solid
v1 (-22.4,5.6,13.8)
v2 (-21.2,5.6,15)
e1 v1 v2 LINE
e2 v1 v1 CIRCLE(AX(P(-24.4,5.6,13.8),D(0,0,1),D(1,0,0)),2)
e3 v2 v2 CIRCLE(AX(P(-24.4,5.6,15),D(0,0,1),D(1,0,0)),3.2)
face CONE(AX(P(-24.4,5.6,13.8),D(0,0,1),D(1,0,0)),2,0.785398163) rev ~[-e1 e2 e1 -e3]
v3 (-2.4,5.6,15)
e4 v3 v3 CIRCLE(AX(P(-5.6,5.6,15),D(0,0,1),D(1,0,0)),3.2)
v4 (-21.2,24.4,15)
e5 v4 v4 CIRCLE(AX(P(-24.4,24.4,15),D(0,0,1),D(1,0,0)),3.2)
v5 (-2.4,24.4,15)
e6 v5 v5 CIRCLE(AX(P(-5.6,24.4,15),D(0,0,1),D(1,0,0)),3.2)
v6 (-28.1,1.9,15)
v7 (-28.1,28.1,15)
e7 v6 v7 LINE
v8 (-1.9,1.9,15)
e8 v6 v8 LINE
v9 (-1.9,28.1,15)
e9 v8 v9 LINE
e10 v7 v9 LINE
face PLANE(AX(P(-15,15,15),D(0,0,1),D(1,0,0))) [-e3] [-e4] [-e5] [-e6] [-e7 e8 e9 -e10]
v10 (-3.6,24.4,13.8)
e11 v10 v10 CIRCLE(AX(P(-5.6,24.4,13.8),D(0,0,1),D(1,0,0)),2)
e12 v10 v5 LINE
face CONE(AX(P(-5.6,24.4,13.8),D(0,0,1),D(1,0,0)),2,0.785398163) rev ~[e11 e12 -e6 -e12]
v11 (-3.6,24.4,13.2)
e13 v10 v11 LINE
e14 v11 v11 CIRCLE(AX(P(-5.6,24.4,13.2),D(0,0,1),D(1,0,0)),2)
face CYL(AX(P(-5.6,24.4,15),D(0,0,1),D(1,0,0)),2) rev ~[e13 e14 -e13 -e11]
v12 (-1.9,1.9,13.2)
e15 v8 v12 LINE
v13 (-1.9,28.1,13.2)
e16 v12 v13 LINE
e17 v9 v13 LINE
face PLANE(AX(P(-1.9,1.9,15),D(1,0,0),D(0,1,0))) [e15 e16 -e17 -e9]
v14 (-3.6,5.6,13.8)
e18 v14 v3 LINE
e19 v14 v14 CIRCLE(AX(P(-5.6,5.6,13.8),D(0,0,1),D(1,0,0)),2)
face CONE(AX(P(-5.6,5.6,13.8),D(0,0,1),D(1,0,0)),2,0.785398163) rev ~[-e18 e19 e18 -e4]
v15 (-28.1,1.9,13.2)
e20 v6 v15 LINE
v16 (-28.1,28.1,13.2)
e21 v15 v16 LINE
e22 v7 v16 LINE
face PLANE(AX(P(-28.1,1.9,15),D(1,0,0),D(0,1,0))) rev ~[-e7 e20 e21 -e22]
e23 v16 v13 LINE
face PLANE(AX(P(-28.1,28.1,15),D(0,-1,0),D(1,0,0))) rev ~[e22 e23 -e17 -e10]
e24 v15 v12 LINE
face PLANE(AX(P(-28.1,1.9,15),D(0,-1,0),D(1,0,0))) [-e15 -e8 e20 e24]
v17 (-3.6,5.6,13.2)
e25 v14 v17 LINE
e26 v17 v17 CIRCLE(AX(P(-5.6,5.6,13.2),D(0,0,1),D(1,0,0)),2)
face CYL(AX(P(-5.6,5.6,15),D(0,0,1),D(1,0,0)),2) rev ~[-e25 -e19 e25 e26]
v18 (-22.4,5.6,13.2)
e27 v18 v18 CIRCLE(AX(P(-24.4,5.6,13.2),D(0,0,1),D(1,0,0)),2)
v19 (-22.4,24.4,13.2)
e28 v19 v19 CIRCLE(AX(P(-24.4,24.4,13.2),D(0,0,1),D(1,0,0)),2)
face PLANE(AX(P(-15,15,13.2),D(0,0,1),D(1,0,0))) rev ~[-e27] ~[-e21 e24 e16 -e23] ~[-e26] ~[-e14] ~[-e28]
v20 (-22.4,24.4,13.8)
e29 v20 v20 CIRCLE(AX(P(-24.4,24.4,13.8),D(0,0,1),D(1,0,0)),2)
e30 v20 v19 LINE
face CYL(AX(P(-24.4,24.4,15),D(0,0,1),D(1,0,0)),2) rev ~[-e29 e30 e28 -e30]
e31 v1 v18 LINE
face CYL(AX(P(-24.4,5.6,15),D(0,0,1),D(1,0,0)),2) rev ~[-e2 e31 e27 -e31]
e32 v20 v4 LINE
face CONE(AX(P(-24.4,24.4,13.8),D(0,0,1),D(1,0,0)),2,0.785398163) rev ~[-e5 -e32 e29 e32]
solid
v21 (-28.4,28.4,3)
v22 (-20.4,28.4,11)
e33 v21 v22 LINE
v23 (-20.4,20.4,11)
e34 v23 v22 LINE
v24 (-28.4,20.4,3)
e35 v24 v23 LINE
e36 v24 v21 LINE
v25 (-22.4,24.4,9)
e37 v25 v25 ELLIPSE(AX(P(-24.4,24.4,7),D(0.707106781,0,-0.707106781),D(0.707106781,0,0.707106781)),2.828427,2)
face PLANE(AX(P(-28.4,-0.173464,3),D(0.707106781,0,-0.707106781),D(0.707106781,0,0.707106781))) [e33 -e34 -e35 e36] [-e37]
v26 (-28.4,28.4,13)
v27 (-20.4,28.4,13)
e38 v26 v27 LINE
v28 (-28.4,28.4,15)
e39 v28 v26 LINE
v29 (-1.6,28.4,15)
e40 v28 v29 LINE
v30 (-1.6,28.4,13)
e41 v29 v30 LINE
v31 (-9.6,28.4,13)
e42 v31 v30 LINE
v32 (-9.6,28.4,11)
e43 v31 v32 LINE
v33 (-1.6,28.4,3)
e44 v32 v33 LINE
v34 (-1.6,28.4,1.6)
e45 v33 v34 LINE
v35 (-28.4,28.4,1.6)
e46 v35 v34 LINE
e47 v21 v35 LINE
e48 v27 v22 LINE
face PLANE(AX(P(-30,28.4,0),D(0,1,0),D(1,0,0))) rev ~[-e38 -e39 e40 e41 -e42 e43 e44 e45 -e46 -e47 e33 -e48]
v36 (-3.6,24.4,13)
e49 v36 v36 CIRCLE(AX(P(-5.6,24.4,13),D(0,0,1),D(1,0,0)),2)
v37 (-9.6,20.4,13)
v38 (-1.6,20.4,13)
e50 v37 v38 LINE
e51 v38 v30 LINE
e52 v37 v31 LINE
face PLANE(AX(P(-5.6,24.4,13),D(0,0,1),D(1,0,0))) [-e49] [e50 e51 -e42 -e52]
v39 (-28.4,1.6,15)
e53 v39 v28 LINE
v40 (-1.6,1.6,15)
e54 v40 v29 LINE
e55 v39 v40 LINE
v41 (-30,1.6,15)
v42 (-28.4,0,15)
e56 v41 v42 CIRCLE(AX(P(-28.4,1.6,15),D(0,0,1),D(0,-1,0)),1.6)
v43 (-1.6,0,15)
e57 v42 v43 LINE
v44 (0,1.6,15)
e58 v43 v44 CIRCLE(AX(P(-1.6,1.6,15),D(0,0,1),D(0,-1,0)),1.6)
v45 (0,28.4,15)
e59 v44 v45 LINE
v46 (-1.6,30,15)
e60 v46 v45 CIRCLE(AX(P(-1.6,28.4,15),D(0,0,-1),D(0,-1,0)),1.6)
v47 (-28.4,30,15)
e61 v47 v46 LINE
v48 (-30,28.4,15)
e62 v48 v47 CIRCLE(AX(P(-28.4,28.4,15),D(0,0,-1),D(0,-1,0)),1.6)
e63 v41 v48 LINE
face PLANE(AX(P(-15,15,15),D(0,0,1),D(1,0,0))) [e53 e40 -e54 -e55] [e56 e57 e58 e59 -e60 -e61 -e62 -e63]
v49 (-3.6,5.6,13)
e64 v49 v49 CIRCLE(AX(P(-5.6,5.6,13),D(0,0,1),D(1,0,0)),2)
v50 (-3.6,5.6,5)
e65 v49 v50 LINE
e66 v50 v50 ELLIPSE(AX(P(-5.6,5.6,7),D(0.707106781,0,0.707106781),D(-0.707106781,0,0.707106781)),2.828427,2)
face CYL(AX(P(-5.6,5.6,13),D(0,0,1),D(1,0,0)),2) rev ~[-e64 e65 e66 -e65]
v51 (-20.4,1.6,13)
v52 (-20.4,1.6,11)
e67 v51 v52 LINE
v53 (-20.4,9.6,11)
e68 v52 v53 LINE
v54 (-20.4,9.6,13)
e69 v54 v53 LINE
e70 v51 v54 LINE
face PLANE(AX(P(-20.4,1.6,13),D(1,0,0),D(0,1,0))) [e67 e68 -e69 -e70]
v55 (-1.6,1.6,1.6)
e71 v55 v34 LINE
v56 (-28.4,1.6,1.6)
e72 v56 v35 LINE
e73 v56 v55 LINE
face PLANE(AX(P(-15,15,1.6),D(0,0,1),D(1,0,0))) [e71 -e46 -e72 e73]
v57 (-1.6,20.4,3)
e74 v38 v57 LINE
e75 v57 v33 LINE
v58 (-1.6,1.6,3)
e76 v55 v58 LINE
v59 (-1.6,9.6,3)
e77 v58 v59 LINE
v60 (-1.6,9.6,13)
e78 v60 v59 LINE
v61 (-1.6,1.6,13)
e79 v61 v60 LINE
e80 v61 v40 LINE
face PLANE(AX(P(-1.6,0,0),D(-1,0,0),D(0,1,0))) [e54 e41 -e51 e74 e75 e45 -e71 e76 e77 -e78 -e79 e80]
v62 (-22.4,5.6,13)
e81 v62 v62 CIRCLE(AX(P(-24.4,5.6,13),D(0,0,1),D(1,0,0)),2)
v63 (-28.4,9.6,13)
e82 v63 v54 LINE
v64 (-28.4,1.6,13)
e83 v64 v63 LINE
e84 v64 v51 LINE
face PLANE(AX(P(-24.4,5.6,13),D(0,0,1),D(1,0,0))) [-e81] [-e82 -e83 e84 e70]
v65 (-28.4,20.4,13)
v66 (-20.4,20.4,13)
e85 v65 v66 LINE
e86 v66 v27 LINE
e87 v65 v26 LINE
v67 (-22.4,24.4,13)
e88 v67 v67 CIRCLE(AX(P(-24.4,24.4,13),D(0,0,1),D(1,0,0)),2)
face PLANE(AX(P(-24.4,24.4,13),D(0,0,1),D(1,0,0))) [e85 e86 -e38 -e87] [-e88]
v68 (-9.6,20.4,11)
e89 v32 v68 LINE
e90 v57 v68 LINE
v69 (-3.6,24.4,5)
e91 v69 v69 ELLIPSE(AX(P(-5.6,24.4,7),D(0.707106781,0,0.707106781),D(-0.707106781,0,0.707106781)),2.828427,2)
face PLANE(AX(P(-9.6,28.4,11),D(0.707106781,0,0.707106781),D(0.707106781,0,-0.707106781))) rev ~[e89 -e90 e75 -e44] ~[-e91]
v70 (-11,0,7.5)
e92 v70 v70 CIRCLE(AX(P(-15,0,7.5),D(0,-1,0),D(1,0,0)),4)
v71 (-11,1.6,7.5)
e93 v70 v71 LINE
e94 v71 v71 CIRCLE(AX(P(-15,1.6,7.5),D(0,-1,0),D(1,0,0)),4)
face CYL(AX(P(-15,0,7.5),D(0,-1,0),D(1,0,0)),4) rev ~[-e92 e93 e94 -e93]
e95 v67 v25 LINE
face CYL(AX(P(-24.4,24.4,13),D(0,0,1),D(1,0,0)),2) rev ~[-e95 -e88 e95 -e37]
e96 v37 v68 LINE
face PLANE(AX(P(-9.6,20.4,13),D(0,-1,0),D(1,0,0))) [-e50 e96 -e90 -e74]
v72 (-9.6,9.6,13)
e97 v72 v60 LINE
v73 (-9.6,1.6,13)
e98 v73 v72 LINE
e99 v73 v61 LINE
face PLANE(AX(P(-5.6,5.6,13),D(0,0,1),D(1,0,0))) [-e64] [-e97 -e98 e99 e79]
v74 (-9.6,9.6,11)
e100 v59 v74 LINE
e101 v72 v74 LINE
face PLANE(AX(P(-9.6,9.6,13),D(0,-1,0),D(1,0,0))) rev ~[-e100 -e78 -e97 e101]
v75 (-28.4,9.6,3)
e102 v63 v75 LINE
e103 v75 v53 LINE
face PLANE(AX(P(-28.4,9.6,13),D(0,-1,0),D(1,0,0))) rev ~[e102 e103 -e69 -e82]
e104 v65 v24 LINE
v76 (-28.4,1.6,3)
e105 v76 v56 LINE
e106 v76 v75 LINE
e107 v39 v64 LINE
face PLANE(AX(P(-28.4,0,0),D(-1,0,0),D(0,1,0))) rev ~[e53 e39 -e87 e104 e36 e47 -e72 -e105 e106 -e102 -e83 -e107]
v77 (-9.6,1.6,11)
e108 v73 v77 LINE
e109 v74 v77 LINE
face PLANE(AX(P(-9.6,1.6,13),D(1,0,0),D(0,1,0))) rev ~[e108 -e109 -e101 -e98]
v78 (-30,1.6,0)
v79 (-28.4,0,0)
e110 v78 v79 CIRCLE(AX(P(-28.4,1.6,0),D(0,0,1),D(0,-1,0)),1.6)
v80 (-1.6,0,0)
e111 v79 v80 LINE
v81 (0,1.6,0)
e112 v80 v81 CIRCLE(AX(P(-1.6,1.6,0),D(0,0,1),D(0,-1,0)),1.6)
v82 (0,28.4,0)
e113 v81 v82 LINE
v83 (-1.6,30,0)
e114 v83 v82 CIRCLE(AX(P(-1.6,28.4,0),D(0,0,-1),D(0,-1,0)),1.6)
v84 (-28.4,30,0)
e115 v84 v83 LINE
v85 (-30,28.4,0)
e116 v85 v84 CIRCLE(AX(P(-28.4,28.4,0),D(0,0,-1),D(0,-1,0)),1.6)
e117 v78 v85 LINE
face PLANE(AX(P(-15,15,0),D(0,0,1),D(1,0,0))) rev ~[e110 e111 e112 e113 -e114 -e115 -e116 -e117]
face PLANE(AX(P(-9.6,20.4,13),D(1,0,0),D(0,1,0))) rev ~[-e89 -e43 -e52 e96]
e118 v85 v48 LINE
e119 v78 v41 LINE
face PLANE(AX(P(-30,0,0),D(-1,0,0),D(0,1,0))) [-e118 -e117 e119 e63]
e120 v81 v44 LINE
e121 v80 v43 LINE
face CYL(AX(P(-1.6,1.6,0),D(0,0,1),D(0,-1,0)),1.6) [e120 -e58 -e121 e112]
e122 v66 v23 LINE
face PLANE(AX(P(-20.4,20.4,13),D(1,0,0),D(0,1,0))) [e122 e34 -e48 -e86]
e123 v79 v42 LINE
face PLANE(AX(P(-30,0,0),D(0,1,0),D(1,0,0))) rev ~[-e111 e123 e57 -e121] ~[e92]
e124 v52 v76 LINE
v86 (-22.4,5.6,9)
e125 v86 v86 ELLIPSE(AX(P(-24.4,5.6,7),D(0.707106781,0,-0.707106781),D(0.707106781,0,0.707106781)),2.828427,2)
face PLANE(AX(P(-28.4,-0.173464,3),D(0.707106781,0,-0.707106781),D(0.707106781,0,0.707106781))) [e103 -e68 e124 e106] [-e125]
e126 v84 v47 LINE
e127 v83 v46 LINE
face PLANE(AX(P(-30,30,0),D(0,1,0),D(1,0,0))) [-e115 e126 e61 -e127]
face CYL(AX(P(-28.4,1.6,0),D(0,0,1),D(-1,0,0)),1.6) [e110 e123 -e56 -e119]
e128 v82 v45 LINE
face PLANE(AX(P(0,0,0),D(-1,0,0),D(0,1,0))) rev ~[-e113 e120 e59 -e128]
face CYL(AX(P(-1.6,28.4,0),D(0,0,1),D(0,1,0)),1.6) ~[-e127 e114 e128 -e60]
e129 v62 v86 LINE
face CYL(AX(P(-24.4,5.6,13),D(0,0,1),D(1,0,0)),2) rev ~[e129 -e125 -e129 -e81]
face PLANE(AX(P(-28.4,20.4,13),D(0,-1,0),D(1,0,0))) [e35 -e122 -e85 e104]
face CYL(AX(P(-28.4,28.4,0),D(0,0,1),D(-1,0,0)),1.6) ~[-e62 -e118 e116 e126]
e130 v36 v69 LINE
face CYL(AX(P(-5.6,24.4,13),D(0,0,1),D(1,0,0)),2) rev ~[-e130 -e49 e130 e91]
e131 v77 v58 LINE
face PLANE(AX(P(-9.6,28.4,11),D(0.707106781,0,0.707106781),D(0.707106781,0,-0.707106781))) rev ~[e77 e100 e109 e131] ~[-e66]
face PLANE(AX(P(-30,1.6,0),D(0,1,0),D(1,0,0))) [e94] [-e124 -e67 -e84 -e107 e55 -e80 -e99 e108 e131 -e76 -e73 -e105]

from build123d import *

# Parameters (mm, degrees)
F0_W         = 30
F0_H         = 30
F1_DEPTH     = 15
F2_T         = -1.6
F4_W         = 8
F4_H         = 8
F4_R         = 2
F5_DEPTH     = 10
F6_T4_DEPTH  = 28.5734639037
F6_T9_DEPTH  = 28.5734639037
F6_T14_DEPTH = 28.5734639037
F6_T19_DEPTH = 28.5734639037
F7_R         = 4
F8_DEPTH     = 1.6
F9_W         = 26.2
F9_H         = 26.2
F9_R         = 2
F10_DEPTH    = 1.8
F11_SIZE     = 1.2
F12_R        = 1.6


# Not quite as in the source:
# - a fillet or chamfer that OpenCascade refuses, or shapes differently, is made with other operations: its cross-section is extruded or revolved along the edge and cut away or added


with BuildPart() as f1:
    # F0 (on Top) → F1 (new body)
    with BuildSketch(Plane.XY):
        with Locations((-15, 15)):
            Rectangle(F0_W, F0_H)
    extrude(amount=F1_DEPTH)

    # F2
    f2_openings = [f1.faces().sort_by_distance(p)[0] for p in [
        (-15, 15, 15),
    ]]
    offset(amount=F2_T, openings=f2_openings)

    # F4 (on offset) → F5 (join)
    with BuildSketch(Plane.XY.offset(13)):
        with Locations((-24.4, 24.4)):
            Rectangle(F4_W, F4_H)
        with Locations((-24.4, 24.4)):
            Circle(F4_R, mode=Mode.SUBTRACT)
        with Locations((-5.6, 24.4)):
            Rectangle(F4_W, F4_H)
        with Locations((-5.6, 24.4)):
            Circle(F4_R, mode=Mode.SUBTRACT)
        with Locations((-5.6, 5.6)):
            Rectangle(F4_W, F4_H)
        with Locations((-5.6, 5.6)):
            Circle(F4_R, mode=Mode.SUBTRACT)
        with Locations((-24.4, 5.6)):
            Rectangle(F4_W, F4_H)
        with Locations((-24.4, 5.6)):
            Circle(F4_R, mode=Mode.SUBTRACT)
    extrude(amount=-F5_DEPTH)

    # F6: chamfer of 8 on 4 edges, made by hand


with BuildPart() as f6_tool2:
    # F6_s3 → F6_t4 (new body)
    with BuildSketch(Plane.XZ.offset(0.1734639037)):
        Polygon((-28.4, 3), (-20.4, 11), (-20.4, 3), align=None)
    extrude(amount=-F6_T4_DEPTH)

    split(bisect_by=Plane.XZ.offset(-1.6), keep=Keep.BOTTOM)


with BuildPart() as f1_1:
    add(f1.part)

    # F6_t1: cut F6_tool2
    add(f6_tool2.part, mode=Mode.SUBTRACT)


with BuildPart() as f6_tool7:
    # F6_s8 → F6_t9 (new body)
    with BuildSketch(Plane.XZ.offset(-28.4)):
        Polygon((-9.6, 11), (-1.6, 3), (-9.6, 3), align=None)
    extrude(amount=F6_T9_DEPTH)

    split(bisect_by=Plane.XZ.offset(-1.6), keep=Keep.BOTTOM)


with BuildPart() as f1_2:
    add(f1_1.part)

    # F6_t6: cut F6_tool7
    add(f6_tool7.part, mode=Mode.SUBTRACT)


with BuildPart() as f6_tool12:
    # F6_s13 → F6_t14 (new body)
    with BuildSketch(Plane.XZ.offset(-30.1734639037)):
        Polygon((-1.6, 3), (-9.6, 11), (-9.6, 3), align=None)
    extrude(amount=F6_T14_DEPTH)

    split(bisect_by=Plane.XZ.offset(-28.4), keep=Keep.TOP)


with BuildPart() as f1_3:
    add(f1_2.part)

    # F6_t11: cut F6_tool12
    add(f6_tool12.part, mode=Mode.SUBTRACT)


with BuildPart() as f6_tool17:
    # F6_s18 → F6_t19 (new body)
    with BuildSketch(Plane.XZ.offset(-1.6)):
        Polygon((-20.4, 11), (-28.4, 3), (-20.4, 3), align=None)
    extrude(amount=-F6_T19_DEPTH)

    split(bisect_by=Plane.XZ.offset(-28.4), keep=Keep.TOP)


with BuildPart() as f1_4:
    add(f1_3.part)

    # F6_t16: cut F6_tool17
    add(f6_tool17.part, mode=Mode.SUBTRACT)

    # F7 (on face) → F8 (cut, through all)
    with BuildSketch(Plane.XZ):
        with Locations((-15, 7.5)):
            Circle(F7_R)
    extrude(amount=-F8_DEPTH, mode=Mode.SUBTRACT)

    # F12
    f12_edges = [f1_4.edges().sort_by_distance(p)[0] for p in [
        (0, 30, 7.5),
        (-30, 30, 7.5),
        (-30, 0, 7.5),
        (0, 0, 7.5),
    ]]
    fillet(f12_edges, radius=F12_R)


with BuildPart() as f10:
    # F9 (on face) → F10 (new body)
    with BuildSketch(Plane.XY.offset(15)):
        with Locations((-15, 15)):
            Rectangle(F9_W, F9_H)
        with Locations((-24.4, 5.6)):
            Circle(F9_R, mode=Mode.SUBTRACT)
        with Locations((-5.6, 5.6)):
            Circle(F9_R, mode=Mode.SUBTRACT)
        with Locations((-24.4, 24.4)):
            Circle(F9_R, mode=Mode.SUBTRACT)
        with Locations((-5.6, 24.4)):
            Circle(F9_R, mode=Mode.SUBTRACT)
    extrude(amount=-F10_DEPTH)

    # F11
    f11_edges = [f10.edges().sort_by_distance(p)[0] for p in [
        (-7.6, 24.4, 15),
        (-7.6, 5.6, 15),
        (-26.4, 5.6, 15),
        (-26.4, 24.4, 15),
    ]]
    chamfer(f11_edges, length=F11_SIZE)


solid = Compound([f1_4.part, f10.part])
